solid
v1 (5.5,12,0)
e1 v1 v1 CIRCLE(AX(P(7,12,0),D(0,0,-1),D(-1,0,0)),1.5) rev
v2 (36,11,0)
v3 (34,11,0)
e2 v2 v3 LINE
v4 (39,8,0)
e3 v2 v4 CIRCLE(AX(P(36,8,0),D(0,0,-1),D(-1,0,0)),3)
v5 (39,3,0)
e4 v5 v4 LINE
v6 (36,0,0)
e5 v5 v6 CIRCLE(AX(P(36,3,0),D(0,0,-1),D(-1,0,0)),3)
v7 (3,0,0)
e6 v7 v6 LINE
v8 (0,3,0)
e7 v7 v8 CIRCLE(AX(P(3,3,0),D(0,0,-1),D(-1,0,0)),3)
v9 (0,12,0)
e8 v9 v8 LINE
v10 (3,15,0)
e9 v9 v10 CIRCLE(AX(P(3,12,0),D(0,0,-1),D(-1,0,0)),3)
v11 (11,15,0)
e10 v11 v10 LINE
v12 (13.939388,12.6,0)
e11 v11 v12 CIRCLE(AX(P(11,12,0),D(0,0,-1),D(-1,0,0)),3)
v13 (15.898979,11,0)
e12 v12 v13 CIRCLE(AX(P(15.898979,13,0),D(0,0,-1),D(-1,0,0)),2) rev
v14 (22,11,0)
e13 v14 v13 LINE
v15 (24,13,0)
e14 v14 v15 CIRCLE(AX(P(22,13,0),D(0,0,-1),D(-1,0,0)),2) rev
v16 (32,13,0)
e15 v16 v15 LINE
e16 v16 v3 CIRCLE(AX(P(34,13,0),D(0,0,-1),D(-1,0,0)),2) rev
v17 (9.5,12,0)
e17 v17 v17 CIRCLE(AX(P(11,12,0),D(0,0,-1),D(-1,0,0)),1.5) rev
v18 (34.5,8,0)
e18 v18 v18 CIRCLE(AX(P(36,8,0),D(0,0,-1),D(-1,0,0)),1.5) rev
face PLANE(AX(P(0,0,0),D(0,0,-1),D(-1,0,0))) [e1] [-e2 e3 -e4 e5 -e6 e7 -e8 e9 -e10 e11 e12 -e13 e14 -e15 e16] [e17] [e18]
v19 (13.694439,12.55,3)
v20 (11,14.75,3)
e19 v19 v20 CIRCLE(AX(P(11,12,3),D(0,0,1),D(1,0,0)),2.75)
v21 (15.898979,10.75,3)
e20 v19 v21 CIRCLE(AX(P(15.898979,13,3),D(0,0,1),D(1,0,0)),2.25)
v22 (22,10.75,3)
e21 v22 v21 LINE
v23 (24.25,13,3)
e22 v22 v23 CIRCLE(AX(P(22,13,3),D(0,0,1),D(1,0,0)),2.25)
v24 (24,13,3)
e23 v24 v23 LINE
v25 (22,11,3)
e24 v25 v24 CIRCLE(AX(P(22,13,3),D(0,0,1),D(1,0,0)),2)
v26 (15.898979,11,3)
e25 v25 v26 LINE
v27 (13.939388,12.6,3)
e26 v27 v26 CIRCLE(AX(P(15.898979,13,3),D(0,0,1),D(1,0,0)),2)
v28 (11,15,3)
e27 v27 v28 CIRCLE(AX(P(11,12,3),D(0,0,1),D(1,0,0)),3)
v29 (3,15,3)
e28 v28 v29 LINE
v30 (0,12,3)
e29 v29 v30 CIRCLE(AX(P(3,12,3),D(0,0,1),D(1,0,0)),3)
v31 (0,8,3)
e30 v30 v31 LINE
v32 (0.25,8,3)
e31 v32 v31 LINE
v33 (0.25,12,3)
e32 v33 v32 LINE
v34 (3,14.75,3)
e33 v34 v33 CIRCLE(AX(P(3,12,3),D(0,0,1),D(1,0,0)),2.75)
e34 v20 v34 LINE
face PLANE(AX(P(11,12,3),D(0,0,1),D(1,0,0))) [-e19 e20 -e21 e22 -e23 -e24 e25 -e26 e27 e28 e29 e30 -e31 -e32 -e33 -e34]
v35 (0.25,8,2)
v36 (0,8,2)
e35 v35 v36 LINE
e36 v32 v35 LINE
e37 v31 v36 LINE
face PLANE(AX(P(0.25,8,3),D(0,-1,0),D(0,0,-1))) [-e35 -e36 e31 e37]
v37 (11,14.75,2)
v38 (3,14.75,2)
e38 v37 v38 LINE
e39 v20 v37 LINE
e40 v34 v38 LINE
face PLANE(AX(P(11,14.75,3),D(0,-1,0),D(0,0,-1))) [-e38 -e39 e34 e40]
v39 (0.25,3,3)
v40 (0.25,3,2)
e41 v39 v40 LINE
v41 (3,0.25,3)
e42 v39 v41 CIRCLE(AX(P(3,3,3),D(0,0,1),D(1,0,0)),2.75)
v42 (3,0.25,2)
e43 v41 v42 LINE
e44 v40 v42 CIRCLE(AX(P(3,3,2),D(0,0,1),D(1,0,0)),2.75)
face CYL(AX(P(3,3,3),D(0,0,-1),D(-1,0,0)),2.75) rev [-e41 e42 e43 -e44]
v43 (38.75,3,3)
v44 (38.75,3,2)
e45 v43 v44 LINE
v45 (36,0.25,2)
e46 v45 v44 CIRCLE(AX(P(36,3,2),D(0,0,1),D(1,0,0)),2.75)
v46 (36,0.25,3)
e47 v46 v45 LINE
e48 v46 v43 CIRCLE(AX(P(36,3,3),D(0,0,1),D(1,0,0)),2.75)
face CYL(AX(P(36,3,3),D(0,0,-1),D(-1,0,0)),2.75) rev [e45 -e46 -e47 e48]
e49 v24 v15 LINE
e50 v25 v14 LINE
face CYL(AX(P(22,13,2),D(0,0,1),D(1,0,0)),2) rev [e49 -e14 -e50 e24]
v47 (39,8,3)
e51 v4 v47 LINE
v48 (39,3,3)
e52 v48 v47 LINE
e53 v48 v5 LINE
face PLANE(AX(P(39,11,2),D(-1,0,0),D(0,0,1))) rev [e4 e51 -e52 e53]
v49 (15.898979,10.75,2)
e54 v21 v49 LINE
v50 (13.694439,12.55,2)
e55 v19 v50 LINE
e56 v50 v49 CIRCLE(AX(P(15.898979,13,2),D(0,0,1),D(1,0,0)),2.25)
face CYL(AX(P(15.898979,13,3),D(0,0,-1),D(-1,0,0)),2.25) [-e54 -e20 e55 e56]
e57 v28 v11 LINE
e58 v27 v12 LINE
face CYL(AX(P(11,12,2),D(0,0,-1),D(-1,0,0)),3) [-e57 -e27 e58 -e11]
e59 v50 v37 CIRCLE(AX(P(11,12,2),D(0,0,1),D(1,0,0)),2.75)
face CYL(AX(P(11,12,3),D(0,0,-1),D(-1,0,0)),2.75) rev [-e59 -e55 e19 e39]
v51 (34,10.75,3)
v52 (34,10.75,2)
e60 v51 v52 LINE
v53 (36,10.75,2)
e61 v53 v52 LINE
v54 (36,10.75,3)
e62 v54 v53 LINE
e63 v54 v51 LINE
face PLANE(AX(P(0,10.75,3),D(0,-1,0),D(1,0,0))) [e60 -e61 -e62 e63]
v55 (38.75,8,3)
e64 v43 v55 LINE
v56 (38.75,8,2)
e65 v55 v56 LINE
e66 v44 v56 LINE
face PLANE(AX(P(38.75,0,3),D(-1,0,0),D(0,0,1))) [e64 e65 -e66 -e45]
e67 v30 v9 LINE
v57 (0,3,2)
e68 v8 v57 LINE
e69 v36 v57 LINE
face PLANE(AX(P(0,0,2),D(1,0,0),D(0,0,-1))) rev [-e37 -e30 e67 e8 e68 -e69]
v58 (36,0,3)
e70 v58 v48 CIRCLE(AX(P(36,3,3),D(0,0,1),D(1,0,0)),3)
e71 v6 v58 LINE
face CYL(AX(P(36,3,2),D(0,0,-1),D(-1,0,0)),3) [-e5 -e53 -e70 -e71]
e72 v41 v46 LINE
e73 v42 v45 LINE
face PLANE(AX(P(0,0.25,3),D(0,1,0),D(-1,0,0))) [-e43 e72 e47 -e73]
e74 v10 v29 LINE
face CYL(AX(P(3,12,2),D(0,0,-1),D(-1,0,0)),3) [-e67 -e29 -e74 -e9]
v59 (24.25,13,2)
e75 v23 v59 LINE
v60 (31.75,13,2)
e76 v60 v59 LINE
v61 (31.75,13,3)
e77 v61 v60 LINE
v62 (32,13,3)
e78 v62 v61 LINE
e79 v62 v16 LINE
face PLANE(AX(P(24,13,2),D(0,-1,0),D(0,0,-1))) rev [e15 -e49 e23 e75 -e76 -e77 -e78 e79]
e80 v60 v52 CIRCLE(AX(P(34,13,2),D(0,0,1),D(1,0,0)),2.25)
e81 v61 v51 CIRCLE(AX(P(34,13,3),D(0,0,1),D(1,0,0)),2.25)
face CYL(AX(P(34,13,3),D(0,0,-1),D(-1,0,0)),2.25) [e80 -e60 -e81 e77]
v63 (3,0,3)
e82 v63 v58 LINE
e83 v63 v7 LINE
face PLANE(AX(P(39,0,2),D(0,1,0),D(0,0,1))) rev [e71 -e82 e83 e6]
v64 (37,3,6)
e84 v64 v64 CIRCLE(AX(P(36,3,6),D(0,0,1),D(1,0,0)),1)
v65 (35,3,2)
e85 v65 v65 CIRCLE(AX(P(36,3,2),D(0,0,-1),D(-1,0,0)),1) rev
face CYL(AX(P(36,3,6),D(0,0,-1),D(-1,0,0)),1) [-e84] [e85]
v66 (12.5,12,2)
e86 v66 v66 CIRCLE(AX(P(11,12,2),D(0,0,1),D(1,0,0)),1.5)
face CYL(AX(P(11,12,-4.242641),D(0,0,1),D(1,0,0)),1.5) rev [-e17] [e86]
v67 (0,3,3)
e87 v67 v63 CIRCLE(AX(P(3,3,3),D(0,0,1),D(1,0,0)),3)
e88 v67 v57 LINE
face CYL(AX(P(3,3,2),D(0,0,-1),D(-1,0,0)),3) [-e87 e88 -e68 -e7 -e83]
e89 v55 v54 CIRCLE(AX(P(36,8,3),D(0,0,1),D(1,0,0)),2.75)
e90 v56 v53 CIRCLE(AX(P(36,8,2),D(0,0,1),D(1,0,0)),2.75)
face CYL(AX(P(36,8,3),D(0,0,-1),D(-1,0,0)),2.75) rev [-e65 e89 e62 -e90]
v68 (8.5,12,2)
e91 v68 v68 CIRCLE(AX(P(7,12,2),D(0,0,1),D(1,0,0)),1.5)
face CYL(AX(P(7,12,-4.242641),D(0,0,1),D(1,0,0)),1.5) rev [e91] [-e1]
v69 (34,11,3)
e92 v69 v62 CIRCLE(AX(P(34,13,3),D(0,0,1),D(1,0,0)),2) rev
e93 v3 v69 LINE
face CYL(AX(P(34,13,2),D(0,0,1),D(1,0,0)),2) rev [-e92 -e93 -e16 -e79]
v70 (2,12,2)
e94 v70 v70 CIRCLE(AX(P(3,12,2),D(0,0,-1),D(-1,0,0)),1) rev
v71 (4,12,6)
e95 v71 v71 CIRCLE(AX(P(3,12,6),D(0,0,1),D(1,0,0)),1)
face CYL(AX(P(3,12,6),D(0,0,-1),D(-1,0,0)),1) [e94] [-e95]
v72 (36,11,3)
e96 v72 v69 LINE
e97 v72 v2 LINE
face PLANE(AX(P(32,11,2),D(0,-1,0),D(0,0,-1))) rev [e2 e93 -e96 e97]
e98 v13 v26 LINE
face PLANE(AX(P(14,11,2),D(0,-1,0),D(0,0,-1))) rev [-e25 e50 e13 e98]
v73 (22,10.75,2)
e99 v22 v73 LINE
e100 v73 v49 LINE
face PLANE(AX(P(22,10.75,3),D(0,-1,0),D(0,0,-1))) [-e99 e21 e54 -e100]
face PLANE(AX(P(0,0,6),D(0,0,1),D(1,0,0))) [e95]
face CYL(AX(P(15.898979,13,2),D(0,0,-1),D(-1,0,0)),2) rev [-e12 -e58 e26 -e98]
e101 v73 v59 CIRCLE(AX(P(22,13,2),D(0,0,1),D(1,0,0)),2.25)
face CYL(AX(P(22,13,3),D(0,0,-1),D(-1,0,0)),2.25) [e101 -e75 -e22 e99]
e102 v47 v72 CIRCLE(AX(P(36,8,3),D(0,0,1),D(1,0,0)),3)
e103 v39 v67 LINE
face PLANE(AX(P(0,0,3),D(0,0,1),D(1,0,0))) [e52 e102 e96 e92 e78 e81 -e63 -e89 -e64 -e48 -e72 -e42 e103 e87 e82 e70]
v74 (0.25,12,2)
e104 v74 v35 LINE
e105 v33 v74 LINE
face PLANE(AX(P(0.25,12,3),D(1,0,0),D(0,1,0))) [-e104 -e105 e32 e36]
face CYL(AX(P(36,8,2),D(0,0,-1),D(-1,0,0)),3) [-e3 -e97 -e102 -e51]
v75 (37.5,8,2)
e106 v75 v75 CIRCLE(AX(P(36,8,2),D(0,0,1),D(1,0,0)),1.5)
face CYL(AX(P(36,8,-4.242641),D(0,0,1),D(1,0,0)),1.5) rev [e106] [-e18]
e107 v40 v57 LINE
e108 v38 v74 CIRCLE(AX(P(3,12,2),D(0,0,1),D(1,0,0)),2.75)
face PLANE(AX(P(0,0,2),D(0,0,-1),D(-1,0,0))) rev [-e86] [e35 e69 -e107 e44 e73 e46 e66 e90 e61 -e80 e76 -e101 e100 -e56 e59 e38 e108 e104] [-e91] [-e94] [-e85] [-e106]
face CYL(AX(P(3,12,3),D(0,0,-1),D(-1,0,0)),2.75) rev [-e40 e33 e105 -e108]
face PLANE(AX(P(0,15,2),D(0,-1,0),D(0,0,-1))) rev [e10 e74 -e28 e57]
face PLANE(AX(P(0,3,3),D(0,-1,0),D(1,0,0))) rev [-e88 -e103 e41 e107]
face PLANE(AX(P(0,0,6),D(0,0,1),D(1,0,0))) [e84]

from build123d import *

# Parameters (mm, degrees)
BOSS_EXTRUDE1_DEPTH = 2
FILLET1_R           = 3
FILLET2_R           = 2
SKETCH3_R           = 1.5
CUT_EXTRUDE1_DEPTH  = 2
BOSS_EXTRUDE2_START = 1
BOSS_EXTRUDE2_DEPTH = 1
SKETCH3_5_R         = 1
BOSS_EXTRUDE3_DEPTH = 4


with BuildPart() as part:
    # Sketch1 → Boss-Extrude1 (new body)
    with BuildSketch(Plane.XY):
        Polygon((0, 0), (0, 15), (14, 15), (14, 11), (24, 11), (24, 13), (32, 13), (32, 11), (39, 11), (39, 0), align=None)
    extrude(amount=BOSS_EXTRUDE1_DEPTH)

    # Fillet1
    fillet1_edges = [part.edges().sort_by_distance(p)[0] for p in [
        (0, 0, 1),
        (0, 15, 1),
        (14, 15, 1),
        (39, 11, 1),
        (39, 0, 1),
    ]]
    fillet(fillet1_edges, radius=FILLET1_R)

    # Fillet2
    fillet2_edges = [part.edges().sort_by_distance(p)[0] for p in [
        (32, 11, 1),
        (24, 11, 1),
        (14, 11, 1),
    ]]
    fillet(fillet2_edges, radius=FILLET2_R - 0.0001)  # a hair under: the kernel refuses the full size

    # Sketch3 → Cut-Extrude1 (cut)
    with BuildSketch(Plane.XY.offset(2)):
        with Locations((7, 12)):
            Circle(SKETCH3_R)
        with Locations((11, 12)):
            Circle(SKETCH3_R)
        with Locations((36, 8)):
            Circle(SKETCH3_R)
    extrude(amount=-CUT_EXTRUDE1_DEPTH, mode=Mode.SUBTRACT)

    # Sketch3<4> → Boss-Extrude2 (add)
    with BuildSketch(Plane.XY.offset(2).offset(BOSS_EXTRUDE2_START)):
        with BuildLine():
            Line((0, 8), (0.25, 8))
            Line((0.25, 8), (0.25, 12))
            ThreePointArc((0.25, 12), (1.055456352, 13.944543648), (3, 14.75))
            Line((3, 14.75), (11, 14.75))
            ThreePointArc((11, 14.75), (12.739252713, 14.13014084), (13.694438717, 12.55))
            ThreePointArc((13.694438717, 12.55), (14.475954538, 11.257157494), (15.898979486, 10.75))
            Line((15.898979486, 10.75), (22, 10.75))
            ThreePointArc((22, 10.75), (23.590990258, 11.409009742), (24.25, 13))
            Line((24.25, 13), (24, 13))
            ThreePointArc((24, 13), (23.414213562, 11.585786438), (22, 11))
            Line((22, 11), (15.898979486, 11))
            ThreePointArc((15.898979486, 11), (14.634068421, 11.450806662), (13.939387691, 12.6))
            ThreePointArc((13.939387691, 12.6), (12.897366596, 14.323790008), (11, 15))
            Line((11, 15), (3, 15))
            ThreePointArc((3, 15), (0.878679656, 14.121320344), (0, 12))
            Line((0, 12), (0, 8))
        make_face()
        with BuildLine():
            ThreePointArc((3, 0.25), (1.055456352, 1.055456352), (0.25, 3))
            Line((0.25, 3), (0, 3))
            ThreePointArc((0, 3), (0.878679656, 0.878679656), (3, 0))
            Line((3, 0), (36, 0))
            ThreePointArc((36, 0), (38.121320344, 0.878679656), (39, 3))
            Line((39, 3), (39, 8))
            ThreePointArc((39, 8), (38.121320344, 10.121320344), (36, 11))
            Line((36, 11), (34, 11))
            ThreePointArc((34, 11), (32.585786438, 11.585786438), (32, 13))
            Line((32, 13), (31.75, 13))
            ThreePointArc((31.75, 13), (32.409009742, 11.409009742), (34, 10.75))
            Line((34, 10.75), (36, 10.75))
            ThreePointArc((36, 10.75), (37.944543648, 9.944543648), (38.75, 8))
            Line((38.75, 8), (38.75, 3))
            ThreePointArc((38.75, 3), (37.944543648, 1.055456352), (36, 0.25))
            Line((36, 0.25), (3, 0.25))
        make_face()
    extrude(amount=-BOSS_EXTRUDE2_DEPTH)

    # Sketch3<5> → Boss-Extrude3 (add)
    with BuildSketch(Plane.XY.offset(2)):
        with Locations(Location((3, 12, 0), (0, 0, 180))):
            Circle(SKETCH3_5_R)
        with Locations(Location((36, 3, 0), (0, 0, 180))):
            Circle(SKETCH3_5_R)
    extrude(amount=BOSS_EXTRUDE3_DEPTH)


solid = part.part
